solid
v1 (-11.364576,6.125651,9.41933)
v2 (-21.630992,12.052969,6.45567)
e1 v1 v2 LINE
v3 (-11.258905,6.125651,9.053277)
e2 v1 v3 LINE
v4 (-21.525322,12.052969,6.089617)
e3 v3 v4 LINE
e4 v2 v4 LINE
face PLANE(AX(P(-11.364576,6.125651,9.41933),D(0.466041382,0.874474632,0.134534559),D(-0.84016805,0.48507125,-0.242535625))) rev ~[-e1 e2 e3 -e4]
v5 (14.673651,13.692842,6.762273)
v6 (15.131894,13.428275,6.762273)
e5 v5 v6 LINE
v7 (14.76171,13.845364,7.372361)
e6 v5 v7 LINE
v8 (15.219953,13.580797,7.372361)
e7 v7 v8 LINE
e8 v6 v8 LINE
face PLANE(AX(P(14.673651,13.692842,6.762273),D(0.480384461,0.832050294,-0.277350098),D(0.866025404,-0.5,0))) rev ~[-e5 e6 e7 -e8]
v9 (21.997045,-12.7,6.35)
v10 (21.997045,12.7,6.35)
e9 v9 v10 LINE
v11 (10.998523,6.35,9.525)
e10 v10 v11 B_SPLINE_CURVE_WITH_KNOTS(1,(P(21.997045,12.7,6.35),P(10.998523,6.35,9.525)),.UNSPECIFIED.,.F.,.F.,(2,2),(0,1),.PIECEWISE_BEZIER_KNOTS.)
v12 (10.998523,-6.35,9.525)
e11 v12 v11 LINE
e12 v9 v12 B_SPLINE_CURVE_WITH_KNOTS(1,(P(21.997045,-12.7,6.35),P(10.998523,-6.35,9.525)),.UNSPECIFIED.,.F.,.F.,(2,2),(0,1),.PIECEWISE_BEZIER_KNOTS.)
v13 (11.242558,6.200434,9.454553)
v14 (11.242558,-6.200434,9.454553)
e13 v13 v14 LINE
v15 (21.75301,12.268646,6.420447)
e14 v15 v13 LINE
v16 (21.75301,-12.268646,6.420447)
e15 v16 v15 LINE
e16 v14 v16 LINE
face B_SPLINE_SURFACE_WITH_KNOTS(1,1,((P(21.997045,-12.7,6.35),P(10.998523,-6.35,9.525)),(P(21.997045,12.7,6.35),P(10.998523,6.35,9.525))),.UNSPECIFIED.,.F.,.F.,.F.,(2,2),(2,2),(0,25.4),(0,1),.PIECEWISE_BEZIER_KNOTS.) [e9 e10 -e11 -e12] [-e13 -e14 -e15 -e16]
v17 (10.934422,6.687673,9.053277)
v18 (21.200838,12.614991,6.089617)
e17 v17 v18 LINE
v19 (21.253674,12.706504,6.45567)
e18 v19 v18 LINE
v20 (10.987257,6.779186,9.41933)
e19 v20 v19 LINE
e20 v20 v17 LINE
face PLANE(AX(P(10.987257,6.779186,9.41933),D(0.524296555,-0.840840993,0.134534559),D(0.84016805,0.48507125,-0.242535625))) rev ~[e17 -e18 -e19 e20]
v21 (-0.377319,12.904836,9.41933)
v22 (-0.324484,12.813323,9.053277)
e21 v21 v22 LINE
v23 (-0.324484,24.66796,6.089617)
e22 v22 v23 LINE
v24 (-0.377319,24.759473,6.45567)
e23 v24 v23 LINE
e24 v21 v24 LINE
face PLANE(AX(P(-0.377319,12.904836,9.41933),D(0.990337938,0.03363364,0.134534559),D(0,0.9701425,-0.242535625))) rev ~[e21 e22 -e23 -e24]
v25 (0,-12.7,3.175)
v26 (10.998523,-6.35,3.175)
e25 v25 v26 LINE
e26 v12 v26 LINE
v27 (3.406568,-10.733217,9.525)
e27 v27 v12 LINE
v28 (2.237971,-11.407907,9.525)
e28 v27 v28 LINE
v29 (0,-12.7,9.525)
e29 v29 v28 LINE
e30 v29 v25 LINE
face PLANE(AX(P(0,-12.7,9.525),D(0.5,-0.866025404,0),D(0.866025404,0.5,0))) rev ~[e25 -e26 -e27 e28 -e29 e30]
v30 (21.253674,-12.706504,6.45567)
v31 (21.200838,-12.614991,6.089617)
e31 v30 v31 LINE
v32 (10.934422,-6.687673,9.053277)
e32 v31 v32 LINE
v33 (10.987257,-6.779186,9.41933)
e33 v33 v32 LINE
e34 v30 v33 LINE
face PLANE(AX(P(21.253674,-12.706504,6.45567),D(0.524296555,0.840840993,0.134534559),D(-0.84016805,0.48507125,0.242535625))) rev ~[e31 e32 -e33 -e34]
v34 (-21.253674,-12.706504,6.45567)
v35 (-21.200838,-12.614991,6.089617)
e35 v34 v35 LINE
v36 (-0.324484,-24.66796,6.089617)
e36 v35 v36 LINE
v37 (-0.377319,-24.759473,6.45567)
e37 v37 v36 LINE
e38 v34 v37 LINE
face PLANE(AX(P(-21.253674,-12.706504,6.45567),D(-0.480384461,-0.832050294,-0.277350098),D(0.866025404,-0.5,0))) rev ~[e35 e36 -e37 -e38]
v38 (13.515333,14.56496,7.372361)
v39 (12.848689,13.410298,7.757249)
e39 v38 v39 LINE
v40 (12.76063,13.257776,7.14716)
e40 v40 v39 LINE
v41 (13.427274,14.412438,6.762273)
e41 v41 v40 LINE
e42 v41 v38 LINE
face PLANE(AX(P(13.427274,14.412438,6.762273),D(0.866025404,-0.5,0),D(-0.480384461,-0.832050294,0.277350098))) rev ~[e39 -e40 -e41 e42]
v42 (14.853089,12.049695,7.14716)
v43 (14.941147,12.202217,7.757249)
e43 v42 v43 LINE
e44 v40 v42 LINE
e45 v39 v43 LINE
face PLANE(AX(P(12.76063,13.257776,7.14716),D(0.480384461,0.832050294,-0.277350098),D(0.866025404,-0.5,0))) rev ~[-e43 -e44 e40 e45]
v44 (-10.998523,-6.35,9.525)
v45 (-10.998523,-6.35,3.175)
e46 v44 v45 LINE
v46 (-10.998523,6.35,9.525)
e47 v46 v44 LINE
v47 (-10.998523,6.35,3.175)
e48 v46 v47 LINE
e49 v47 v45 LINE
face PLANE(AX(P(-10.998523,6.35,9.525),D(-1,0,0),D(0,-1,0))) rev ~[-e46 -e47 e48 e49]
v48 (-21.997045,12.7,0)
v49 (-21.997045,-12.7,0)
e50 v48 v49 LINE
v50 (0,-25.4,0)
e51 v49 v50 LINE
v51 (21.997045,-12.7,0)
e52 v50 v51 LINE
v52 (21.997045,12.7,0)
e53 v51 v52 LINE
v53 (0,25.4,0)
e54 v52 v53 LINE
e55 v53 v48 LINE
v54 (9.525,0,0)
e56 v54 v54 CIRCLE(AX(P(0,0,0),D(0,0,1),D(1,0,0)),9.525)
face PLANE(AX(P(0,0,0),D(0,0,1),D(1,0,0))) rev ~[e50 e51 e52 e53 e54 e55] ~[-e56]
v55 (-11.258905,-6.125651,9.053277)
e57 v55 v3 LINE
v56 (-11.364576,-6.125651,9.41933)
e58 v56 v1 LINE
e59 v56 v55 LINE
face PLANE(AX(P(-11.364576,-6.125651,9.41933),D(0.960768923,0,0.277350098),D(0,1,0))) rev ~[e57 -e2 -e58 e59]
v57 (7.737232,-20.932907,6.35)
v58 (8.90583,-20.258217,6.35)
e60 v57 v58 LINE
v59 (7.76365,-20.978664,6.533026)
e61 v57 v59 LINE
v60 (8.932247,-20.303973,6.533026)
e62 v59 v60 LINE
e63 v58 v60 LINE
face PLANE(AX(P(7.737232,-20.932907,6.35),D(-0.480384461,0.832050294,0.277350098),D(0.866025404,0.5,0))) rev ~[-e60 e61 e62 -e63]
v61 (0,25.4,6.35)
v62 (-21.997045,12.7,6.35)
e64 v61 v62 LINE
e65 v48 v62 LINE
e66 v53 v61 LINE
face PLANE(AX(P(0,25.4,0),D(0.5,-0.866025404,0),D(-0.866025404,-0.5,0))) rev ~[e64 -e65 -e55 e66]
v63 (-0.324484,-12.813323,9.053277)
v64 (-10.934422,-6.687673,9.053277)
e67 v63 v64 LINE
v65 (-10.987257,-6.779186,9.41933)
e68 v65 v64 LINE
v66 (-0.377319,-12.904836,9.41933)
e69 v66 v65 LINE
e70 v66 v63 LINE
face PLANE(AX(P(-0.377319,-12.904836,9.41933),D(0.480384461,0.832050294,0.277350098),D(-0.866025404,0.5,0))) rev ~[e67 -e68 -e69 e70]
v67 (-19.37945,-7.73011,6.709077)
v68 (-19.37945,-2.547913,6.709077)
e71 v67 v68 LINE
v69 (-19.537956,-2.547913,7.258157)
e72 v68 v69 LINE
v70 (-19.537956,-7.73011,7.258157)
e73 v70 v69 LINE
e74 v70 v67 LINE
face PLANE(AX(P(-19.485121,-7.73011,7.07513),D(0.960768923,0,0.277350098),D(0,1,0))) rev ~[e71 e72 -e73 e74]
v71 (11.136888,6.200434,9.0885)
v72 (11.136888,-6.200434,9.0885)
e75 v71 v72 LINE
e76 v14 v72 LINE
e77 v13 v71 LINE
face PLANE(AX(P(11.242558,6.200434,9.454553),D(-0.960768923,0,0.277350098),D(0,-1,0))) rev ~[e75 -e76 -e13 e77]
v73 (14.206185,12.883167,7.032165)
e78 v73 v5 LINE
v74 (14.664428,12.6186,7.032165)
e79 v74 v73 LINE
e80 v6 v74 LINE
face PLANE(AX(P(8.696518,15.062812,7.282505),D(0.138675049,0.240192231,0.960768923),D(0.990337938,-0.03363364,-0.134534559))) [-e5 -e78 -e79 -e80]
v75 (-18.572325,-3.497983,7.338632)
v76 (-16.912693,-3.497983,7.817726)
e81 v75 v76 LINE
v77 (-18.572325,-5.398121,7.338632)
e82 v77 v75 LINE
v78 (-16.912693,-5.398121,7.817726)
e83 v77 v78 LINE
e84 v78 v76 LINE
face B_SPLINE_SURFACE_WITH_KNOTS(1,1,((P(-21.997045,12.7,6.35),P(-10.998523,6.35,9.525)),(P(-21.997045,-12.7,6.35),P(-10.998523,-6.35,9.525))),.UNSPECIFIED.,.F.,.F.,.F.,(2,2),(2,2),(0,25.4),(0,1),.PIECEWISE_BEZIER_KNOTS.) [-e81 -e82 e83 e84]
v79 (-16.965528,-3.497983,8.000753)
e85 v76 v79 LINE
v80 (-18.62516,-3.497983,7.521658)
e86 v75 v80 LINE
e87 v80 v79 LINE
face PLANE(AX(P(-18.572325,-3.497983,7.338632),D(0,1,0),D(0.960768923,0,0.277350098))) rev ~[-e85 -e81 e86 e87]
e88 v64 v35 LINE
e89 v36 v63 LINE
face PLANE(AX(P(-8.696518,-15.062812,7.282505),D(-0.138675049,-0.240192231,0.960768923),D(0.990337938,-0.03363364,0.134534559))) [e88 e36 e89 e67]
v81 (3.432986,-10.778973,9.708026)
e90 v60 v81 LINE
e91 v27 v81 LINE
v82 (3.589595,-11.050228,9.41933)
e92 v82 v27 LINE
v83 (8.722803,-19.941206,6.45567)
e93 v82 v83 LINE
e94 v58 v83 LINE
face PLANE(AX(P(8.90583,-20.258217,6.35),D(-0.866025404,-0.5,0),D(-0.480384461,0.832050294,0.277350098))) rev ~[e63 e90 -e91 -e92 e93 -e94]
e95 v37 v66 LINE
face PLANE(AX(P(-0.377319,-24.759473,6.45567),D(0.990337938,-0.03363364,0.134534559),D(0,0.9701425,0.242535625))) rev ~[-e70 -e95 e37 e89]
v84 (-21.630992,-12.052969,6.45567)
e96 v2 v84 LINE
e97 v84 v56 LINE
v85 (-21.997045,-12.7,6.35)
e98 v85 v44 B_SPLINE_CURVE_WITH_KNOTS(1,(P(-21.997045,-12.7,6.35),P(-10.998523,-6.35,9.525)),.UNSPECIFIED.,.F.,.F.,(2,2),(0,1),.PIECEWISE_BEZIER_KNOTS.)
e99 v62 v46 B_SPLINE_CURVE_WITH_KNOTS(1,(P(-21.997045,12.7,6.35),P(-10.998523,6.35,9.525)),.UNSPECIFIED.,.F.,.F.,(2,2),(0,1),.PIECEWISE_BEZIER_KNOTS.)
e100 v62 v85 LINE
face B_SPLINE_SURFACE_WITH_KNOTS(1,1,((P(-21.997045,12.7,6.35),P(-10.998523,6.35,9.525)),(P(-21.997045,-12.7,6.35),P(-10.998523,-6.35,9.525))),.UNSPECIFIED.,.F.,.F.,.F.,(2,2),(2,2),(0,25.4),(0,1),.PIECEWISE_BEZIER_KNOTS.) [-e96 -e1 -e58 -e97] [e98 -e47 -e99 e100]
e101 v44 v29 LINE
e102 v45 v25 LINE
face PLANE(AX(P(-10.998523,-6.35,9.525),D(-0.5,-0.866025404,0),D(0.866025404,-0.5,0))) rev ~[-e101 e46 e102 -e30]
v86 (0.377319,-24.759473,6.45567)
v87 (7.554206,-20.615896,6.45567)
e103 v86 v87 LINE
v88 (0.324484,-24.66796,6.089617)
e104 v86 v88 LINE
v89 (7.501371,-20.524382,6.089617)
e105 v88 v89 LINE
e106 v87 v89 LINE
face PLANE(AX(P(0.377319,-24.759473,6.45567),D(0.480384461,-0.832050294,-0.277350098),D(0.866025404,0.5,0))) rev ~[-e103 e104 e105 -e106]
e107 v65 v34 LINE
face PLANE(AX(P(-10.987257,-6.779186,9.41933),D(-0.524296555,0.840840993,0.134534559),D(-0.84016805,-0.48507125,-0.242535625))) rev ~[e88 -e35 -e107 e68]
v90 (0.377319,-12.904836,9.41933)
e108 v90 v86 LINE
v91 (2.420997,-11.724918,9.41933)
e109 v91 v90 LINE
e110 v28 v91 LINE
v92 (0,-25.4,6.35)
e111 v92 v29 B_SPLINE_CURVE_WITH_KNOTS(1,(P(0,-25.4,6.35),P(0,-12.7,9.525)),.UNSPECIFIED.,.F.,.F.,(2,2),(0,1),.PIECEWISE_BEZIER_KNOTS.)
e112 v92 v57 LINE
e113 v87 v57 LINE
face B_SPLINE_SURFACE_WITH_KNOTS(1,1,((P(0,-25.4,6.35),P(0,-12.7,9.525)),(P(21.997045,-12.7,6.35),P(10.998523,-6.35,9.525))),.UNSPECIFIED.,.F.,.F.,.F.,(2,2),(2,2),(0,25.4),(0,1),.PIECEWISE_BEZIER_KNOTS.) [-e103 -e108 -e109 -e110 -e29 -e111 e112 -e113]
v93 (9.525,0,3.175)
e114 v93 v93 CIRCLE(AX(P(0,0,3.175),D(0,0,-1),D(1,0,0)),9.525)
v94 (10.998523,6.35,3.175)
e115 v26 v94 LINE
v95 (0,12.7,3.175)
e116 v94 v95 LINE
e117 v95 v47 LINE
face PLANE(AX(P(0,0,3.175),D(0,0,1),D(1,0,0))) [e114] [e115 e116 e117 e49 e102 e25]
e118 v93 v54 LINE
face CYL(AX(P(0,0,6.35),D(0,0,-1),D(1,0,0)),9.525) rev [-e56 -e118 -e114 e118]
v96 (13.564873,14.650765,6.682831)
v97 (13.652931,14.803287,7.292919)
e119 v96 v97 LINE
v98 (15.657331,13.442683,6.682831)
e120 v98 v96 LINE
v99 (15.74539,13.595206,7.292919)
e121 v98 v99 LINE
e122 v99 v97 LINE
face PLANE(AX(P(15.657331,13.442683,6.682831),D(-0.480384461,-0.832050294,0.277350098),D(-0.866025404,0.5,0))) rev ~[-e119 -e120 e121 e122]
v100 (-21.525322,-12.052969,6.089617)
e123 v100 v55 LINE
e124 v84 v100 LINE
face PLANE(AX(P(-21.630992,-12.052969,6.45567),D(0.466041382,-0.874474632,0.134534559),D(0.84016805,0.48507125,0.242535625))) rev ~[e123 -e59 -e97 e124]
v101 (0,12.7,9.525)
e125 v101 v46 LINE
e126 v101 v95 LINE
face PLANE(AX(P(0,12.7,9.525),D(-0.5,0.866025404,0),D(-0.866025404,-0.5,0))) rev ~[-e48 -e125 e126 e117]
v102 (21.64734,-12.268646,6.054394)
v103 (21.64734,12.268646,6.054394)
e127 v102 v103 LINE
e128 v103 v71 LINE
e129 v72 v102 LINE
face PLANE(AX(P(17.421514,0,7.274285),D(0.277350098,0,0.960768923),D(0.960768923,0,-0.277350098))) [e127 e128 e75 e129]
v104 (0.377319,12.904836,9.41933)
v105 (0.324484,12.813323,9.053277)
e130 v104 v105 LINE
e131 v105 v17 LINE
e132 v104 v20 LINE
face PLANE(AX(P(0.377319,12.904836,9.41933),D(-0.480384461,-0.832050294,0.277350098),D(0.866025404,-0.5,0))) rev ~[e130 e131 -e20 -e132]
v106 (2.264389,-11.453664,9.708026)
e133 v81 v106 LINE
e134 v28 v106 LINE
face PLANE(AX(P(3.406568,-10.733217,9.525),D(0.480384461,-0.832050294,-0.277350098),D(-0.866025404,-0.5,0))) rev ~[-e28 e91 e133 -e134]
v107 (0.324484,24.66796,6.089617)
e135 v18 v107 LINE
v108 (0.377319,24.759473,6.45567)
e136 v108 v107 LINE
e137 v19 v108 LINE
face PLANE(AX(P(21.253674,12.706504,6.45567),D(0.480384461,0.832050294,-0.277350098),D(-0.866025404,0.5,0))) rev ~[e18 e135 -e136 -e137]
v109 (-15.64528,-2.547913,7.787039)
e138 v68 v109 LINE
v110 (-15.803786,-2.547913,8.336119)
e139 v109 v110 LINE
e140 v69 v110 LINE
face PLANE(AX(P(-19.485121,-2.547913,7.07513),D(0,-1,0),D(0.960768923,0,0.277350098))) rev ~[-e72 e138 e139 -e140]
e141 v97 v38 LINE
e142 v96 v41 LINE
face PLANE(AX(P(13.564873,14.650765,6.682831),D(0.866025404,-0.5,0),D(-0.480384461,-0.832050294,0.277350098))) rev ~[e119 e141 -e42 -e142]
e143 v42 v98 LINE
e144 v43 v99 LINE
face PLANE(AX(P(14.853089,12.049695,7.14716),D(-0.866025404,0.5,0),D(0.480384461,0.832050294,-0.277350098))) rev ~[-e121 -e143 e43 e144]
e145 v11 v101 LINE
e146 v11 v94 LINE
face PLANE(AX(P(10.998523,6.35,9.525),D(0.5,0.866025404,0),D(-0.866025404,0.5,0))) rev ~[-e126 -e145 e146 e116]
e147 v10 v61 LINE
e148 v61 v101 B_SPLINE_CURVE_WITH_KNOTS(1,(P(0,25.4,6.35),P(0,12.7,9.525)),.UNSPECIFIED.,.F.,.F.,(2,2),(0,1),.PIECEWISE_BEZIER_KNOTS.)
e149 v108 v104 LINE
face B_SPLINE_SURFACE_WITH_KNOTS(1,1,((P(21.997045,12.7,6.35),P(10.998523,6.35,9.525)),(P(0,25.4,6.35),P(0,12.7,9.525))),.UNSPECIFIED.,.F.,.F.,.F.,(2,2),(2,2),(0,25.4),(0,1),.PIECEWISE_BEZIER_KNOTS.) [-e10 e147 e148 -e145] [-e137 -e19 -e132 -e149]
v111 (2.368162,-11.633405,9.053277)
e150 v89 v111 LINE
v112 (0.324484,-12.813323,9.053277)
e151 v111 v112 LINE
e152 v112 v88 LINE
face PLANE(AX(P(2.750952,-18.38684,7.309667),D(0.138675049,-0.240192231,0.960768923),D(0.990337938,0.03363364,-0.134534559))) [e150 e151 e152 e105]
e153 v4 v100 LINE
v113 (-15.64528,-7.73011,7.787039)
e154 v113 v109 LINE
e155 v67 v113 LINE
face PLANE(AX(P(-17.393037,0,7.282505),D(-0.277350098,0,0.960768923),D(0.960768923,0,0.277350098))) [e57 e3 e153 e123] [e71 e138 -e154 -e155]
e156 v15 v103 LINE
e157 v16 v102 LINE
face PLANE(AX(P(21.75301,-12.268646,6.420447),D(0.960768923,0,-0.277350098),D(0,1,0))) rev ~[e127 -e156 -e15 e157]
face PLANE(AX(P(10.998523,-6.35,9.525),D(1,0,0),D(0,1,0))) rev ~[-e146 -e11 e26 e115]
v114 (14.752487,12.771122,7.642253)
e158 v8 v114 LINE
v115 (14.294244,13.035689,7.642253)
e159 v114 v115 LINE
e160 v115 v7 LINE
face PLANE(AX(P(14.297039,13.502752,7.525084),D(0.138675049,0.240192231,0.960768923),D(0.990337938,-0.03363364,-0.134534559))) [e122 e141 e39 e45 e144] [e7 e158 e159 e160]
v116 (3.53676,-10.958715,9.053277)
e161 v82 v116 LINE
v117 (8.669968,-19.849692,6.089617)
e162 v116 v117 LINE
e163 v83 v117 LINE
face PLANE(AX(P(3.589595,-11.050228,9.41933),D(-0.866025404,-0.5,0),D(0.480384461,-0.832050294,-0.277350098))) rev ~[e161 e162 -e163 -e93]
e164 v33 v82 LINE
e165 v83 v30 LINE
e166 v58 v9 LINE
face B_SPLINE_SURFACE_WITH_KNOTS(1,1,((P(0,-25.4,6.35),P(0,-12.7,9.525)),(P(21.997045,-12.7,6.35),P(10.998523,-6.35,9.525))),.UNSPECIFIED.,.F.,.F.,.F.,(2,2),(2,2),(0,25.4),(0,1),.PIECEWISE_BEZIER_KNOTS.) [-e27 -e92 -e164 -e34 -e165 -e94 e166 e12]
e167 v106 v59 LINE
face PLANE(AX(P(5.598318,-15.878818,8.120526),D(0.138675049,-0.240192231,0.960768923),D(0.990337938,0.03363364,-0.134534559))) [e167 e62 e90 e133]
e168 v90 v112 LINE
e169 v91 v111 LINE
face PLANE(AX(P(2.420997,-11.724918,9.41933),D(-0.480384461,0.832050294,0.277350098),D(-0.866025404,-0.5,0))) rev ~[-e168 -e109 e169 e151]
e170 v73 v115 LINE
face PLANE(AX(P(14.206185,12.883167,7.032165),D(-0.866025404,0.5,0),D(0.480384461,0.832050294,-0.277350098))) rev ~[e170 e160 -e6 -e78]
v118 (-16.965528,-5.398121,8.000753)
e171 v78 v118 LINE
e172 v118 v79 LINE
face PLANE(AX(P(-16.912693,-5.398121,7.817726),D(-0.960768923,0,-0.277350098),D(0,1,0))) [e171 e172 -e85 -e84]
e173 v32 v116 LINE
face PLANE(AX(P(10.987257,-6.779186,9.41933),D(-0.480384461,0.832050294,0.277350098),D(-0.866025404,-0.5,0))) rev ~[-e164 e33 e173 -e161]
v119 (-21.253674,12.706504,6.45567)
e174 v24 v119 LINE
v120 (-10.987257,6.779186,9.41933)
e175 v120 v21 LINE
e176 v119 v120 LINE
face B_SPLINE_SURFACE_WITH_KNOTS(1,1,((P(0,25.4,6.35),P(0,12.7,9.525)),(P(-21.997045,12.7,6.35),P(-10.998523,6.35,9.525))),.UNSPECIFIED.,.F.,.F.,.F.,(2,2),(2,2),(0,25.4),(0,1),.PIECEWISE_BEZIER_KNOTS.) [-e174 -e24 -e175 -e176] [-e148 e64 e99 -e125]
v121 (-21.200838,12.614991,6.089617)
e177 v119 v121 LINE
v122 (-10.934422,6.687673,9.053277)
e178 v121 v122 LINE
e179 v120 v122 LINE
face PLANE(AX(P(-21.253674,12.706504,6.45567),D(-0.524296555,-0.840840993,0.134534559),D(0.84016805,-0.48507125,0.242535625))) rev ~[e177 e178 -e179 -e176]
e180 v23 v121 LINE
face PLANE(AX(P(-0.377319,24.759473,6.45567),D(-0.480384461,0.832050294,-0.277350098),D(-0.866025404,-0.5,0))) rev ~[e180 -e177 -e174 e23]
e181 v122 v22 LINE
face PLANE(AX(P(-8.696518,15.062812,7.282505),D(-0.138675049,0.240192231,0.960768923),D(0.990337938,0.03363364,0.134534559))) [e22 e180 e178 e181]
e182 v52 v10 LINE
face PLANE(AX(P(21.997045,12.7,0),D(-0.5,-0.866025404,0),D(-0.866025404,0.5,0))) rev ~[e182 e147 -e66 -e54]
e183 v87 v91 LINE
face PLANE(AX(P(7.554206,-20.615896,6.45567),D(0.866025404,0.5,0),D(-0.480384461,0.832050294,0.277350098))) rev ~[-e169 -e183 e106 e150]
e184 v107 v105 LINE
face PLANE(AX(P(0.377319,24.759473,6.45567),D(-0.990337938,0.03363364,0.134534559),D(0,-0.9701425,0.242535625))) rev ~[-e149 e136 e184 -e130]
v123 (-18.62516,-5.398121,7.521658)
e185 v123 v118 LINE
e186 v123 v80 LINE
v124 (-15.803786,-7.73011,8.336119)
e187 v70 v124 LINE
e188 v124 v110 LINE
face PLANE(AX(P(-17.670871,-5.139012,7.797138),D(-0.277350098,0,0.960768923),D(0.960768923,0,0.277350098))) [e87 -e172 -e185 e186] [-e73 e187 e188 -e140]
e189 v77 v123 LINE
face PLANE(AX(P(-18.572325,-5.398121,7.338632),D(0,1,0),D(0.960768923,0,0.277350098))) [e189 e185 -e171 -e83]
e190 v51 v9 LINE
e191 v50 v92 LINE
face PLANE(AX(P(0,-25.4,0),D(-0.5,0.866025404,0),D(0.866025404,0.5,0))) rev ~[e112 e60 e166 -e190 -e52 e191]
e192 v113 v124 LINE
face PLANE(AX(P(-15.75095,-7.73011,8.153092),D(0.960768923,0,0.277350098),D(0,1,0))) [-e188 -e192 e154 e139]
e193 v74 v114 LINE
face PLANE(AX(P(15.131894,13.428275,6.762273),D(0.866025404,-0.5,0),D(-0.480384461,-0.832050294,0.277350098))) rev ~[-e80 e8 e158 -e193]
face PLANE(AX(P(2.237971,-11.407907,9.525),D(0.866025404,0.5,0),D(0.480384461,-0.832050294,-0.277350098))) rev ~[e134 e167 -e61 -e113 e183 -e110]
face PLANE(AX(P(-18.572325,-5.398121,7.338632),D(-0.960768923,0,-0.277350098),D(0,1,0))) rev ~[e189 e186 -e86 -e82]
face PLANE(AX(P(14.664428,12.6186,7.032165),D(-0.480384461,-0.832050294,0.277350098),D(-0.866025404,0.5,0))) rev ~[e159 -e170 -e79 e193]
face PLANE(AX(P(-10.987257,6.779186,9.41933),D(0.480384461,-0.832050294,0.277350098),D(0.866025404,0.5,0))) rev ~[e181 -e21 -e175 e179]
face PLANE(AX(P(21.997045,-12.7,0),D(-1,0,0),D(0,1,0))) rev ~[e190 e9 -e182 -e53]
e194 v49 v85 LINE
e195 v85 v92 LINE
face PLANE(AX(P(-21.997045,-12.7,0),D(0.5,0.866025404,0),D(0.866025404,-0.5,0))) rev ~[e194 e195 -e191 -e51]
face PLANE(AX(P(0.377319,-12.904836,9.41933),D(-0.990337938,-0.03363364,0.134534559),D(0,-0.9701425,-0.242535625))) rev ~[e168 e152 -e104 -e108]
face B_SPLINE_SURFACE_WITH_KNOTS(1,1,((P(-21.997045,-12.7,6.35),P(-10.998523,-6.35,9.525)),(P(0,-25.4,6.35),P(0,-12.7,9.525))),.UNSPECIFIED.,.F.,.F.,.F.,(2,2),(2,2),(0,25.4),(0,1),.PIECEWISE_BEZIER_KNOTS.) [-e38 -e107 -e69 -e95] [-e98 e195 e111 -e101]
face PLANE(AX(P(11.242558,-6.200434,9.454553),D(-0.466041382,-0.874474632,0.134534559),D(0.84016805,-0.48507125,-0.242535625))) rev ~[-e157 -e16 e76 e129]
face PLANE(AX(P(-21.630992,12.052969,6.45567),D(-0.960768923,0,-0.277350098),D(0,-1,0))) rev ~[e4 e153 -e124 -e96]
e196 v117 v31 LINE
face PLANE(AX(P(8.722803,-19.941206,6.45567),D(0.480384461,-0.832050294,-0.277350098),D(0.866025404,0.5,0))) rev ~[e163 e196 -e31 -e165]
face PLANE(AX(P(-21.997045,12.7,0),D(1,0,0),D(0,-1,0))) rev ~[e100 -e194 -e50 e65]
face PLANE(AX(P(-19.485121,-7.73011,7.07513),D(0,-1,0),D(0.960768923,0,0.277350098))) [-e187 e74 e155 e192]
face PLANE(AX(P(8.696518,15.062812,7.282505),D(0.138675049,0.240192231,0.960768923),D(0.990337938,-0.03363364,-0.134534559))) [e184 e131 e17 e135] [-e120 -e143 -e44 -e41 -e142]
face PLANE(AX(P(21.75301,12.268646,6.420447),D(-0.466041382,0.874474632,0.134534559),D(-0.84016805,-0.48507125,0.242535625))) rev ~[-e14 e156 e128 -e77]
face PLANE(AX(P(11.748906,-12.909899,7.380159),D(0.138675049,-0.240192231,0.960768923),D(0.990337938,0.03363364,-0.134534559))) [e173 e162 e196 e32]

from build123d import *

# Parameters (mm, degrees)
F0_R      = 9.525
F1_DEPTH  = 6.35
F2_R      = 9.525
F3_DEPTH  = 3.175
F8_DEPTH  = 6.35
F9_W      = 3.8866475224
F9_H      = 5.1821961533
F9_W_2    = 1.7273994163
F9_H_2    = 1.9001385663
F10_DEPTH = 0.1905
F12_DEPTH = 0.1905
F13_DEPTH = 0.381
F15_DEPTH = 0.381
F17_DEPTH = 0.381
F18_W     = 3.8866475224
F18_H     = 5.1821961533
F19_DEPTH = 0.381
F21_DEPTH = 0.381
F23_DEPTH = 0.381
F25_DEPTH = 0.635


# Not quite as in the source:
# - a feature names something its author has since deleted; it is built from what else it names


with BuildPart() as f1:
    # F0 (on Top) → F1 (new body)
    with BuildSketch(Plane.XY):
        Polygon((21.9970452561, 12.7), (0, 25.4), (-21.9970452561, 12.7), (-21.9970452561, -12.7), (0, -25.4), (21.9970452561, -12.7), align=None)
        Polygon((-10.9985226281, 6.35), (0, 12.7), (10.9985226281, 6.35), (10.9985226281, -6.35), (0, -12.7), (-10.9985226281, -6.35), align=None, mode=Mode.SUBTRACT)
        Polygon((10.9985226281, 6.35), (0, 12.7), (-10.9985226281, 6.35), (-10.9985226281, -6.35), (0, -12.7), (10.9985226281, -6.35), align=None)
        Circle(F0_R, mode=Mode.SUBTRACT)
    extrude(amount=F1_DEPTH)

    # F2 (on face) → F3 (join)
    with BuildSketch(Plane.XY.offset(6.35)):
        Polygon((-10.9985226281, 6.35), (-10.9985226281, -6.35), (0, -12.7), (10.9985226281, -6.35), (10.9985226281, 6.35), (0, 12.7), align=None)
        Circle(F2_R, mode=Mode.SUBTRACT)
    extrude(amount=F3_DEPTH)

    # F4 (on face) → F6 section 0
    with BuildSketch(Plane.XY.offset(6.35)):
        Polygon((0, -25.4), (21.9970452561, -12.7), (21.9970452561, 12.7), (0, 25.4), (-21.9970452561, 12.7), (-21.9970452561, -12.7), align=None)
    # F5 (on face) → F6 section 1
    with BuildSketch(Plane.XY.offset(9.525)):
        Polygon((0, -12.7), (10.9985226281, -6.35), (10.9985226281, 6.35), (0, 12.7), (-10.9985226281, 6.35), (-10.9985226281, -6.35), align=None)
    loft()

    # F8 (cut): a face of the model
    f8_faces = [f1.faces().sort_by_distance(p)[0] for p in [
        (0, 0, 9.525),
    ]]
    extrude(f8_faces, amount=-F8_DEPTH, mode=Mode.SUBTRACT)

    # F9 (on face) → F10 (join)
    with BuildSketch(Plane(origin=(-3.3841608086, 0, 11.7230769231), x_dir=(0.9607689228, 0, 0.2773500981), z_dir=(-0.2773500981, 0, 0.9607689228))):
        with Locations((-14.8150864989, -5.1390115405)):
            Rectangle(F9_W, F9_H)
        with Locations((-14.9446423166, -4.4480519136)):
            Rectangle(F9_W_2, F9_H_2, mode=Mode.SUBTRACT)
    extrude(amount=F10_DEPTH)

    # F11 (on face) → F12 (join)
    with BuildSketch(Plane(origin=(1.6920804043, -2.9307692308, 11.7230769231), x_dir=(0.9903379377, 0.0336336397, -0.1345345588), z_dir=(0.1386750491, -0.2401922307, 0.9607689228))):
        Polygon((1.7312151801, -8.1025979269), (0.5512164028, -8.7571434803), (6.1041303172, -18.7678014037), (7.2841290946, -18.1132558503), align=None)
    extrude(amount=F12_DEPTH)

    # F7 (on face) → F13 (cut)
    with BuildSketch(Plane(origin=(3.3841608086, 0, 11.7230769231), x_dir=(0.9607689228, 0, -0.2773500981), z_dir=(0.2773500981, 0, 0.9607689228))):
        Polygon((8.1792790536, 6.2004337374), (8.1792790536, -6.2004337374), (19.1189043532, -12.2686460377), (19.1189043532, 12.2686460377), align=None)
    extrude(amount=-F13_DEPTH, mode=Mode.SUBTRACT)

    # F14 (on face) → F15 (cut)
    with BuildSketch(Plane(origin=(1.6920804043, 2.9307692308, 11.7230769231), x_dir=(0.9903379377, -0.0336336397, -0.1345345588), z_dir=(0.1386750491, 0.2401922307, 0.9607689228))):
        Polygon((-1.3275888968, 22.4544873413), (-1.3275888968, 10.2350073173), (9.3858632247, 4.2922533233), (19.7524424685, 10.7613898066), align=None)
    extrude(amount=-F15_DEPTH, mode=Mode.SUBTRACT)

    # F16 (on face) → F17 (cut)
    with BuildSketch(Plane(origin=(-1.6920804043, 2.9307692308, 11.7230769231), x_dir=(0.9903379377, 0.0336336397, 0.1345345588), z_dir=(-0.1386750491, 0.2401922307, 0.9607689228))):
        Polygon((-19.7524424685, 10.7613898066), (-9.3858632247, 4.2922533233), (1.3275888968, 10.2350073173), (1.3275888968, 22.4544873413), align=None)
    extrude(amount=-F17_DEPTH, mode=Mode.SUBTRACT)

    # F18 (on face) → F19 (cut)
    with BuildSketch(Plane(origin=(-3.3841608086, 0, 11.7230769231), x_dir=(0.9607689228, 0, 0.2773500981), z_dir=(-0.2773500981, 0, 0.9607689228))):
        Polygon((-8.3062790536, 6.1256506061), (-18.9919043532, 12.0529690566), (-18.9919043532, -12.0529690566), (-8.3062790536, -6.1256506061), align=None)
        with Locations((-14.8150864989, -5.1390115405)):
            Rectangle(F18_W, F18_H, mode=Mode.SUBTRACT)
    extrude(amount=-F19_DEPTH, mode=Mode.SUBTRACT)

    # F20 (on face) → F21 (cut)
    with BuildSketch(Plane(origin=(-1.6920804043, -2.9307692308, 11.7230769231), x_dir=(0.9903379377, -0.0336336397, 0.1345345588), z_dir=(-0.1386750491, -0.2401922307, 0.9607689228))):
        Polygon((1.3275888968, -22.4544873413), (1.3275888968, -10.2350073173), (-9.3858632247, -4.2922533233), (-19.7524424685, -10.7613898066), align=None)
    extrude(amount=-F21_DEPTH, mode=Mode.SUBTRACT)

    # F22 (on face) → F23 (cut)
    with BuildSketch(Plane(origin=(1.6920804043, -2.9307692308, 11.7230769231), x_dir=(0.9903379377, 0.0336336397, -0.1345345588), z_dir=(0.1386750491, -0.2401922307, 0.9607689228))):
        Polygon((9.3858632247, -4.2922533233), (1.9160273264, -8.4357727618), (7.0993169483, -17.7800810155), (19.7524424685, -10.7613898066), align=None)
        Polygon((5.9193181709, -18.4346265688), (0.736028549, -9.0903183152), (-1.3275888968, -10.2350073173), (-1.3275888968, -22.4544873413), align=None)
    extrude(amount=-F23_DEPTH, mode=Mode.SUBTRACT)

    # F24 (on face) → F25 (join)
    with BuildSketch(Plane(origin=(1.6392452106, 2.8392559909, 11.3570239635), x_dir=(0.9903379377, -0.0336336397, -0.1345345588), z_dir=(0.1386750491, 0.2401922307, 0.9607689228))):
        Polygon((14.1548511611, 11.4204940112), (12.0419776672, 12.5925053529), (11.9030368338, 12.3420262032), (11.2298887321, 11.1284912051), (13.3427622261, 9.9564798634), align=None)
        Polygon((12.6895471254, 10.7929574783), (13.1615737293, 11.6439155403), (13.6242877942, 11.3872479577), (13.1522611902, 10.5362898958), align=None, mode=Mode.SUBTRACT)
    extrude(amount=F25_DEPTH)


solid = f1.part
